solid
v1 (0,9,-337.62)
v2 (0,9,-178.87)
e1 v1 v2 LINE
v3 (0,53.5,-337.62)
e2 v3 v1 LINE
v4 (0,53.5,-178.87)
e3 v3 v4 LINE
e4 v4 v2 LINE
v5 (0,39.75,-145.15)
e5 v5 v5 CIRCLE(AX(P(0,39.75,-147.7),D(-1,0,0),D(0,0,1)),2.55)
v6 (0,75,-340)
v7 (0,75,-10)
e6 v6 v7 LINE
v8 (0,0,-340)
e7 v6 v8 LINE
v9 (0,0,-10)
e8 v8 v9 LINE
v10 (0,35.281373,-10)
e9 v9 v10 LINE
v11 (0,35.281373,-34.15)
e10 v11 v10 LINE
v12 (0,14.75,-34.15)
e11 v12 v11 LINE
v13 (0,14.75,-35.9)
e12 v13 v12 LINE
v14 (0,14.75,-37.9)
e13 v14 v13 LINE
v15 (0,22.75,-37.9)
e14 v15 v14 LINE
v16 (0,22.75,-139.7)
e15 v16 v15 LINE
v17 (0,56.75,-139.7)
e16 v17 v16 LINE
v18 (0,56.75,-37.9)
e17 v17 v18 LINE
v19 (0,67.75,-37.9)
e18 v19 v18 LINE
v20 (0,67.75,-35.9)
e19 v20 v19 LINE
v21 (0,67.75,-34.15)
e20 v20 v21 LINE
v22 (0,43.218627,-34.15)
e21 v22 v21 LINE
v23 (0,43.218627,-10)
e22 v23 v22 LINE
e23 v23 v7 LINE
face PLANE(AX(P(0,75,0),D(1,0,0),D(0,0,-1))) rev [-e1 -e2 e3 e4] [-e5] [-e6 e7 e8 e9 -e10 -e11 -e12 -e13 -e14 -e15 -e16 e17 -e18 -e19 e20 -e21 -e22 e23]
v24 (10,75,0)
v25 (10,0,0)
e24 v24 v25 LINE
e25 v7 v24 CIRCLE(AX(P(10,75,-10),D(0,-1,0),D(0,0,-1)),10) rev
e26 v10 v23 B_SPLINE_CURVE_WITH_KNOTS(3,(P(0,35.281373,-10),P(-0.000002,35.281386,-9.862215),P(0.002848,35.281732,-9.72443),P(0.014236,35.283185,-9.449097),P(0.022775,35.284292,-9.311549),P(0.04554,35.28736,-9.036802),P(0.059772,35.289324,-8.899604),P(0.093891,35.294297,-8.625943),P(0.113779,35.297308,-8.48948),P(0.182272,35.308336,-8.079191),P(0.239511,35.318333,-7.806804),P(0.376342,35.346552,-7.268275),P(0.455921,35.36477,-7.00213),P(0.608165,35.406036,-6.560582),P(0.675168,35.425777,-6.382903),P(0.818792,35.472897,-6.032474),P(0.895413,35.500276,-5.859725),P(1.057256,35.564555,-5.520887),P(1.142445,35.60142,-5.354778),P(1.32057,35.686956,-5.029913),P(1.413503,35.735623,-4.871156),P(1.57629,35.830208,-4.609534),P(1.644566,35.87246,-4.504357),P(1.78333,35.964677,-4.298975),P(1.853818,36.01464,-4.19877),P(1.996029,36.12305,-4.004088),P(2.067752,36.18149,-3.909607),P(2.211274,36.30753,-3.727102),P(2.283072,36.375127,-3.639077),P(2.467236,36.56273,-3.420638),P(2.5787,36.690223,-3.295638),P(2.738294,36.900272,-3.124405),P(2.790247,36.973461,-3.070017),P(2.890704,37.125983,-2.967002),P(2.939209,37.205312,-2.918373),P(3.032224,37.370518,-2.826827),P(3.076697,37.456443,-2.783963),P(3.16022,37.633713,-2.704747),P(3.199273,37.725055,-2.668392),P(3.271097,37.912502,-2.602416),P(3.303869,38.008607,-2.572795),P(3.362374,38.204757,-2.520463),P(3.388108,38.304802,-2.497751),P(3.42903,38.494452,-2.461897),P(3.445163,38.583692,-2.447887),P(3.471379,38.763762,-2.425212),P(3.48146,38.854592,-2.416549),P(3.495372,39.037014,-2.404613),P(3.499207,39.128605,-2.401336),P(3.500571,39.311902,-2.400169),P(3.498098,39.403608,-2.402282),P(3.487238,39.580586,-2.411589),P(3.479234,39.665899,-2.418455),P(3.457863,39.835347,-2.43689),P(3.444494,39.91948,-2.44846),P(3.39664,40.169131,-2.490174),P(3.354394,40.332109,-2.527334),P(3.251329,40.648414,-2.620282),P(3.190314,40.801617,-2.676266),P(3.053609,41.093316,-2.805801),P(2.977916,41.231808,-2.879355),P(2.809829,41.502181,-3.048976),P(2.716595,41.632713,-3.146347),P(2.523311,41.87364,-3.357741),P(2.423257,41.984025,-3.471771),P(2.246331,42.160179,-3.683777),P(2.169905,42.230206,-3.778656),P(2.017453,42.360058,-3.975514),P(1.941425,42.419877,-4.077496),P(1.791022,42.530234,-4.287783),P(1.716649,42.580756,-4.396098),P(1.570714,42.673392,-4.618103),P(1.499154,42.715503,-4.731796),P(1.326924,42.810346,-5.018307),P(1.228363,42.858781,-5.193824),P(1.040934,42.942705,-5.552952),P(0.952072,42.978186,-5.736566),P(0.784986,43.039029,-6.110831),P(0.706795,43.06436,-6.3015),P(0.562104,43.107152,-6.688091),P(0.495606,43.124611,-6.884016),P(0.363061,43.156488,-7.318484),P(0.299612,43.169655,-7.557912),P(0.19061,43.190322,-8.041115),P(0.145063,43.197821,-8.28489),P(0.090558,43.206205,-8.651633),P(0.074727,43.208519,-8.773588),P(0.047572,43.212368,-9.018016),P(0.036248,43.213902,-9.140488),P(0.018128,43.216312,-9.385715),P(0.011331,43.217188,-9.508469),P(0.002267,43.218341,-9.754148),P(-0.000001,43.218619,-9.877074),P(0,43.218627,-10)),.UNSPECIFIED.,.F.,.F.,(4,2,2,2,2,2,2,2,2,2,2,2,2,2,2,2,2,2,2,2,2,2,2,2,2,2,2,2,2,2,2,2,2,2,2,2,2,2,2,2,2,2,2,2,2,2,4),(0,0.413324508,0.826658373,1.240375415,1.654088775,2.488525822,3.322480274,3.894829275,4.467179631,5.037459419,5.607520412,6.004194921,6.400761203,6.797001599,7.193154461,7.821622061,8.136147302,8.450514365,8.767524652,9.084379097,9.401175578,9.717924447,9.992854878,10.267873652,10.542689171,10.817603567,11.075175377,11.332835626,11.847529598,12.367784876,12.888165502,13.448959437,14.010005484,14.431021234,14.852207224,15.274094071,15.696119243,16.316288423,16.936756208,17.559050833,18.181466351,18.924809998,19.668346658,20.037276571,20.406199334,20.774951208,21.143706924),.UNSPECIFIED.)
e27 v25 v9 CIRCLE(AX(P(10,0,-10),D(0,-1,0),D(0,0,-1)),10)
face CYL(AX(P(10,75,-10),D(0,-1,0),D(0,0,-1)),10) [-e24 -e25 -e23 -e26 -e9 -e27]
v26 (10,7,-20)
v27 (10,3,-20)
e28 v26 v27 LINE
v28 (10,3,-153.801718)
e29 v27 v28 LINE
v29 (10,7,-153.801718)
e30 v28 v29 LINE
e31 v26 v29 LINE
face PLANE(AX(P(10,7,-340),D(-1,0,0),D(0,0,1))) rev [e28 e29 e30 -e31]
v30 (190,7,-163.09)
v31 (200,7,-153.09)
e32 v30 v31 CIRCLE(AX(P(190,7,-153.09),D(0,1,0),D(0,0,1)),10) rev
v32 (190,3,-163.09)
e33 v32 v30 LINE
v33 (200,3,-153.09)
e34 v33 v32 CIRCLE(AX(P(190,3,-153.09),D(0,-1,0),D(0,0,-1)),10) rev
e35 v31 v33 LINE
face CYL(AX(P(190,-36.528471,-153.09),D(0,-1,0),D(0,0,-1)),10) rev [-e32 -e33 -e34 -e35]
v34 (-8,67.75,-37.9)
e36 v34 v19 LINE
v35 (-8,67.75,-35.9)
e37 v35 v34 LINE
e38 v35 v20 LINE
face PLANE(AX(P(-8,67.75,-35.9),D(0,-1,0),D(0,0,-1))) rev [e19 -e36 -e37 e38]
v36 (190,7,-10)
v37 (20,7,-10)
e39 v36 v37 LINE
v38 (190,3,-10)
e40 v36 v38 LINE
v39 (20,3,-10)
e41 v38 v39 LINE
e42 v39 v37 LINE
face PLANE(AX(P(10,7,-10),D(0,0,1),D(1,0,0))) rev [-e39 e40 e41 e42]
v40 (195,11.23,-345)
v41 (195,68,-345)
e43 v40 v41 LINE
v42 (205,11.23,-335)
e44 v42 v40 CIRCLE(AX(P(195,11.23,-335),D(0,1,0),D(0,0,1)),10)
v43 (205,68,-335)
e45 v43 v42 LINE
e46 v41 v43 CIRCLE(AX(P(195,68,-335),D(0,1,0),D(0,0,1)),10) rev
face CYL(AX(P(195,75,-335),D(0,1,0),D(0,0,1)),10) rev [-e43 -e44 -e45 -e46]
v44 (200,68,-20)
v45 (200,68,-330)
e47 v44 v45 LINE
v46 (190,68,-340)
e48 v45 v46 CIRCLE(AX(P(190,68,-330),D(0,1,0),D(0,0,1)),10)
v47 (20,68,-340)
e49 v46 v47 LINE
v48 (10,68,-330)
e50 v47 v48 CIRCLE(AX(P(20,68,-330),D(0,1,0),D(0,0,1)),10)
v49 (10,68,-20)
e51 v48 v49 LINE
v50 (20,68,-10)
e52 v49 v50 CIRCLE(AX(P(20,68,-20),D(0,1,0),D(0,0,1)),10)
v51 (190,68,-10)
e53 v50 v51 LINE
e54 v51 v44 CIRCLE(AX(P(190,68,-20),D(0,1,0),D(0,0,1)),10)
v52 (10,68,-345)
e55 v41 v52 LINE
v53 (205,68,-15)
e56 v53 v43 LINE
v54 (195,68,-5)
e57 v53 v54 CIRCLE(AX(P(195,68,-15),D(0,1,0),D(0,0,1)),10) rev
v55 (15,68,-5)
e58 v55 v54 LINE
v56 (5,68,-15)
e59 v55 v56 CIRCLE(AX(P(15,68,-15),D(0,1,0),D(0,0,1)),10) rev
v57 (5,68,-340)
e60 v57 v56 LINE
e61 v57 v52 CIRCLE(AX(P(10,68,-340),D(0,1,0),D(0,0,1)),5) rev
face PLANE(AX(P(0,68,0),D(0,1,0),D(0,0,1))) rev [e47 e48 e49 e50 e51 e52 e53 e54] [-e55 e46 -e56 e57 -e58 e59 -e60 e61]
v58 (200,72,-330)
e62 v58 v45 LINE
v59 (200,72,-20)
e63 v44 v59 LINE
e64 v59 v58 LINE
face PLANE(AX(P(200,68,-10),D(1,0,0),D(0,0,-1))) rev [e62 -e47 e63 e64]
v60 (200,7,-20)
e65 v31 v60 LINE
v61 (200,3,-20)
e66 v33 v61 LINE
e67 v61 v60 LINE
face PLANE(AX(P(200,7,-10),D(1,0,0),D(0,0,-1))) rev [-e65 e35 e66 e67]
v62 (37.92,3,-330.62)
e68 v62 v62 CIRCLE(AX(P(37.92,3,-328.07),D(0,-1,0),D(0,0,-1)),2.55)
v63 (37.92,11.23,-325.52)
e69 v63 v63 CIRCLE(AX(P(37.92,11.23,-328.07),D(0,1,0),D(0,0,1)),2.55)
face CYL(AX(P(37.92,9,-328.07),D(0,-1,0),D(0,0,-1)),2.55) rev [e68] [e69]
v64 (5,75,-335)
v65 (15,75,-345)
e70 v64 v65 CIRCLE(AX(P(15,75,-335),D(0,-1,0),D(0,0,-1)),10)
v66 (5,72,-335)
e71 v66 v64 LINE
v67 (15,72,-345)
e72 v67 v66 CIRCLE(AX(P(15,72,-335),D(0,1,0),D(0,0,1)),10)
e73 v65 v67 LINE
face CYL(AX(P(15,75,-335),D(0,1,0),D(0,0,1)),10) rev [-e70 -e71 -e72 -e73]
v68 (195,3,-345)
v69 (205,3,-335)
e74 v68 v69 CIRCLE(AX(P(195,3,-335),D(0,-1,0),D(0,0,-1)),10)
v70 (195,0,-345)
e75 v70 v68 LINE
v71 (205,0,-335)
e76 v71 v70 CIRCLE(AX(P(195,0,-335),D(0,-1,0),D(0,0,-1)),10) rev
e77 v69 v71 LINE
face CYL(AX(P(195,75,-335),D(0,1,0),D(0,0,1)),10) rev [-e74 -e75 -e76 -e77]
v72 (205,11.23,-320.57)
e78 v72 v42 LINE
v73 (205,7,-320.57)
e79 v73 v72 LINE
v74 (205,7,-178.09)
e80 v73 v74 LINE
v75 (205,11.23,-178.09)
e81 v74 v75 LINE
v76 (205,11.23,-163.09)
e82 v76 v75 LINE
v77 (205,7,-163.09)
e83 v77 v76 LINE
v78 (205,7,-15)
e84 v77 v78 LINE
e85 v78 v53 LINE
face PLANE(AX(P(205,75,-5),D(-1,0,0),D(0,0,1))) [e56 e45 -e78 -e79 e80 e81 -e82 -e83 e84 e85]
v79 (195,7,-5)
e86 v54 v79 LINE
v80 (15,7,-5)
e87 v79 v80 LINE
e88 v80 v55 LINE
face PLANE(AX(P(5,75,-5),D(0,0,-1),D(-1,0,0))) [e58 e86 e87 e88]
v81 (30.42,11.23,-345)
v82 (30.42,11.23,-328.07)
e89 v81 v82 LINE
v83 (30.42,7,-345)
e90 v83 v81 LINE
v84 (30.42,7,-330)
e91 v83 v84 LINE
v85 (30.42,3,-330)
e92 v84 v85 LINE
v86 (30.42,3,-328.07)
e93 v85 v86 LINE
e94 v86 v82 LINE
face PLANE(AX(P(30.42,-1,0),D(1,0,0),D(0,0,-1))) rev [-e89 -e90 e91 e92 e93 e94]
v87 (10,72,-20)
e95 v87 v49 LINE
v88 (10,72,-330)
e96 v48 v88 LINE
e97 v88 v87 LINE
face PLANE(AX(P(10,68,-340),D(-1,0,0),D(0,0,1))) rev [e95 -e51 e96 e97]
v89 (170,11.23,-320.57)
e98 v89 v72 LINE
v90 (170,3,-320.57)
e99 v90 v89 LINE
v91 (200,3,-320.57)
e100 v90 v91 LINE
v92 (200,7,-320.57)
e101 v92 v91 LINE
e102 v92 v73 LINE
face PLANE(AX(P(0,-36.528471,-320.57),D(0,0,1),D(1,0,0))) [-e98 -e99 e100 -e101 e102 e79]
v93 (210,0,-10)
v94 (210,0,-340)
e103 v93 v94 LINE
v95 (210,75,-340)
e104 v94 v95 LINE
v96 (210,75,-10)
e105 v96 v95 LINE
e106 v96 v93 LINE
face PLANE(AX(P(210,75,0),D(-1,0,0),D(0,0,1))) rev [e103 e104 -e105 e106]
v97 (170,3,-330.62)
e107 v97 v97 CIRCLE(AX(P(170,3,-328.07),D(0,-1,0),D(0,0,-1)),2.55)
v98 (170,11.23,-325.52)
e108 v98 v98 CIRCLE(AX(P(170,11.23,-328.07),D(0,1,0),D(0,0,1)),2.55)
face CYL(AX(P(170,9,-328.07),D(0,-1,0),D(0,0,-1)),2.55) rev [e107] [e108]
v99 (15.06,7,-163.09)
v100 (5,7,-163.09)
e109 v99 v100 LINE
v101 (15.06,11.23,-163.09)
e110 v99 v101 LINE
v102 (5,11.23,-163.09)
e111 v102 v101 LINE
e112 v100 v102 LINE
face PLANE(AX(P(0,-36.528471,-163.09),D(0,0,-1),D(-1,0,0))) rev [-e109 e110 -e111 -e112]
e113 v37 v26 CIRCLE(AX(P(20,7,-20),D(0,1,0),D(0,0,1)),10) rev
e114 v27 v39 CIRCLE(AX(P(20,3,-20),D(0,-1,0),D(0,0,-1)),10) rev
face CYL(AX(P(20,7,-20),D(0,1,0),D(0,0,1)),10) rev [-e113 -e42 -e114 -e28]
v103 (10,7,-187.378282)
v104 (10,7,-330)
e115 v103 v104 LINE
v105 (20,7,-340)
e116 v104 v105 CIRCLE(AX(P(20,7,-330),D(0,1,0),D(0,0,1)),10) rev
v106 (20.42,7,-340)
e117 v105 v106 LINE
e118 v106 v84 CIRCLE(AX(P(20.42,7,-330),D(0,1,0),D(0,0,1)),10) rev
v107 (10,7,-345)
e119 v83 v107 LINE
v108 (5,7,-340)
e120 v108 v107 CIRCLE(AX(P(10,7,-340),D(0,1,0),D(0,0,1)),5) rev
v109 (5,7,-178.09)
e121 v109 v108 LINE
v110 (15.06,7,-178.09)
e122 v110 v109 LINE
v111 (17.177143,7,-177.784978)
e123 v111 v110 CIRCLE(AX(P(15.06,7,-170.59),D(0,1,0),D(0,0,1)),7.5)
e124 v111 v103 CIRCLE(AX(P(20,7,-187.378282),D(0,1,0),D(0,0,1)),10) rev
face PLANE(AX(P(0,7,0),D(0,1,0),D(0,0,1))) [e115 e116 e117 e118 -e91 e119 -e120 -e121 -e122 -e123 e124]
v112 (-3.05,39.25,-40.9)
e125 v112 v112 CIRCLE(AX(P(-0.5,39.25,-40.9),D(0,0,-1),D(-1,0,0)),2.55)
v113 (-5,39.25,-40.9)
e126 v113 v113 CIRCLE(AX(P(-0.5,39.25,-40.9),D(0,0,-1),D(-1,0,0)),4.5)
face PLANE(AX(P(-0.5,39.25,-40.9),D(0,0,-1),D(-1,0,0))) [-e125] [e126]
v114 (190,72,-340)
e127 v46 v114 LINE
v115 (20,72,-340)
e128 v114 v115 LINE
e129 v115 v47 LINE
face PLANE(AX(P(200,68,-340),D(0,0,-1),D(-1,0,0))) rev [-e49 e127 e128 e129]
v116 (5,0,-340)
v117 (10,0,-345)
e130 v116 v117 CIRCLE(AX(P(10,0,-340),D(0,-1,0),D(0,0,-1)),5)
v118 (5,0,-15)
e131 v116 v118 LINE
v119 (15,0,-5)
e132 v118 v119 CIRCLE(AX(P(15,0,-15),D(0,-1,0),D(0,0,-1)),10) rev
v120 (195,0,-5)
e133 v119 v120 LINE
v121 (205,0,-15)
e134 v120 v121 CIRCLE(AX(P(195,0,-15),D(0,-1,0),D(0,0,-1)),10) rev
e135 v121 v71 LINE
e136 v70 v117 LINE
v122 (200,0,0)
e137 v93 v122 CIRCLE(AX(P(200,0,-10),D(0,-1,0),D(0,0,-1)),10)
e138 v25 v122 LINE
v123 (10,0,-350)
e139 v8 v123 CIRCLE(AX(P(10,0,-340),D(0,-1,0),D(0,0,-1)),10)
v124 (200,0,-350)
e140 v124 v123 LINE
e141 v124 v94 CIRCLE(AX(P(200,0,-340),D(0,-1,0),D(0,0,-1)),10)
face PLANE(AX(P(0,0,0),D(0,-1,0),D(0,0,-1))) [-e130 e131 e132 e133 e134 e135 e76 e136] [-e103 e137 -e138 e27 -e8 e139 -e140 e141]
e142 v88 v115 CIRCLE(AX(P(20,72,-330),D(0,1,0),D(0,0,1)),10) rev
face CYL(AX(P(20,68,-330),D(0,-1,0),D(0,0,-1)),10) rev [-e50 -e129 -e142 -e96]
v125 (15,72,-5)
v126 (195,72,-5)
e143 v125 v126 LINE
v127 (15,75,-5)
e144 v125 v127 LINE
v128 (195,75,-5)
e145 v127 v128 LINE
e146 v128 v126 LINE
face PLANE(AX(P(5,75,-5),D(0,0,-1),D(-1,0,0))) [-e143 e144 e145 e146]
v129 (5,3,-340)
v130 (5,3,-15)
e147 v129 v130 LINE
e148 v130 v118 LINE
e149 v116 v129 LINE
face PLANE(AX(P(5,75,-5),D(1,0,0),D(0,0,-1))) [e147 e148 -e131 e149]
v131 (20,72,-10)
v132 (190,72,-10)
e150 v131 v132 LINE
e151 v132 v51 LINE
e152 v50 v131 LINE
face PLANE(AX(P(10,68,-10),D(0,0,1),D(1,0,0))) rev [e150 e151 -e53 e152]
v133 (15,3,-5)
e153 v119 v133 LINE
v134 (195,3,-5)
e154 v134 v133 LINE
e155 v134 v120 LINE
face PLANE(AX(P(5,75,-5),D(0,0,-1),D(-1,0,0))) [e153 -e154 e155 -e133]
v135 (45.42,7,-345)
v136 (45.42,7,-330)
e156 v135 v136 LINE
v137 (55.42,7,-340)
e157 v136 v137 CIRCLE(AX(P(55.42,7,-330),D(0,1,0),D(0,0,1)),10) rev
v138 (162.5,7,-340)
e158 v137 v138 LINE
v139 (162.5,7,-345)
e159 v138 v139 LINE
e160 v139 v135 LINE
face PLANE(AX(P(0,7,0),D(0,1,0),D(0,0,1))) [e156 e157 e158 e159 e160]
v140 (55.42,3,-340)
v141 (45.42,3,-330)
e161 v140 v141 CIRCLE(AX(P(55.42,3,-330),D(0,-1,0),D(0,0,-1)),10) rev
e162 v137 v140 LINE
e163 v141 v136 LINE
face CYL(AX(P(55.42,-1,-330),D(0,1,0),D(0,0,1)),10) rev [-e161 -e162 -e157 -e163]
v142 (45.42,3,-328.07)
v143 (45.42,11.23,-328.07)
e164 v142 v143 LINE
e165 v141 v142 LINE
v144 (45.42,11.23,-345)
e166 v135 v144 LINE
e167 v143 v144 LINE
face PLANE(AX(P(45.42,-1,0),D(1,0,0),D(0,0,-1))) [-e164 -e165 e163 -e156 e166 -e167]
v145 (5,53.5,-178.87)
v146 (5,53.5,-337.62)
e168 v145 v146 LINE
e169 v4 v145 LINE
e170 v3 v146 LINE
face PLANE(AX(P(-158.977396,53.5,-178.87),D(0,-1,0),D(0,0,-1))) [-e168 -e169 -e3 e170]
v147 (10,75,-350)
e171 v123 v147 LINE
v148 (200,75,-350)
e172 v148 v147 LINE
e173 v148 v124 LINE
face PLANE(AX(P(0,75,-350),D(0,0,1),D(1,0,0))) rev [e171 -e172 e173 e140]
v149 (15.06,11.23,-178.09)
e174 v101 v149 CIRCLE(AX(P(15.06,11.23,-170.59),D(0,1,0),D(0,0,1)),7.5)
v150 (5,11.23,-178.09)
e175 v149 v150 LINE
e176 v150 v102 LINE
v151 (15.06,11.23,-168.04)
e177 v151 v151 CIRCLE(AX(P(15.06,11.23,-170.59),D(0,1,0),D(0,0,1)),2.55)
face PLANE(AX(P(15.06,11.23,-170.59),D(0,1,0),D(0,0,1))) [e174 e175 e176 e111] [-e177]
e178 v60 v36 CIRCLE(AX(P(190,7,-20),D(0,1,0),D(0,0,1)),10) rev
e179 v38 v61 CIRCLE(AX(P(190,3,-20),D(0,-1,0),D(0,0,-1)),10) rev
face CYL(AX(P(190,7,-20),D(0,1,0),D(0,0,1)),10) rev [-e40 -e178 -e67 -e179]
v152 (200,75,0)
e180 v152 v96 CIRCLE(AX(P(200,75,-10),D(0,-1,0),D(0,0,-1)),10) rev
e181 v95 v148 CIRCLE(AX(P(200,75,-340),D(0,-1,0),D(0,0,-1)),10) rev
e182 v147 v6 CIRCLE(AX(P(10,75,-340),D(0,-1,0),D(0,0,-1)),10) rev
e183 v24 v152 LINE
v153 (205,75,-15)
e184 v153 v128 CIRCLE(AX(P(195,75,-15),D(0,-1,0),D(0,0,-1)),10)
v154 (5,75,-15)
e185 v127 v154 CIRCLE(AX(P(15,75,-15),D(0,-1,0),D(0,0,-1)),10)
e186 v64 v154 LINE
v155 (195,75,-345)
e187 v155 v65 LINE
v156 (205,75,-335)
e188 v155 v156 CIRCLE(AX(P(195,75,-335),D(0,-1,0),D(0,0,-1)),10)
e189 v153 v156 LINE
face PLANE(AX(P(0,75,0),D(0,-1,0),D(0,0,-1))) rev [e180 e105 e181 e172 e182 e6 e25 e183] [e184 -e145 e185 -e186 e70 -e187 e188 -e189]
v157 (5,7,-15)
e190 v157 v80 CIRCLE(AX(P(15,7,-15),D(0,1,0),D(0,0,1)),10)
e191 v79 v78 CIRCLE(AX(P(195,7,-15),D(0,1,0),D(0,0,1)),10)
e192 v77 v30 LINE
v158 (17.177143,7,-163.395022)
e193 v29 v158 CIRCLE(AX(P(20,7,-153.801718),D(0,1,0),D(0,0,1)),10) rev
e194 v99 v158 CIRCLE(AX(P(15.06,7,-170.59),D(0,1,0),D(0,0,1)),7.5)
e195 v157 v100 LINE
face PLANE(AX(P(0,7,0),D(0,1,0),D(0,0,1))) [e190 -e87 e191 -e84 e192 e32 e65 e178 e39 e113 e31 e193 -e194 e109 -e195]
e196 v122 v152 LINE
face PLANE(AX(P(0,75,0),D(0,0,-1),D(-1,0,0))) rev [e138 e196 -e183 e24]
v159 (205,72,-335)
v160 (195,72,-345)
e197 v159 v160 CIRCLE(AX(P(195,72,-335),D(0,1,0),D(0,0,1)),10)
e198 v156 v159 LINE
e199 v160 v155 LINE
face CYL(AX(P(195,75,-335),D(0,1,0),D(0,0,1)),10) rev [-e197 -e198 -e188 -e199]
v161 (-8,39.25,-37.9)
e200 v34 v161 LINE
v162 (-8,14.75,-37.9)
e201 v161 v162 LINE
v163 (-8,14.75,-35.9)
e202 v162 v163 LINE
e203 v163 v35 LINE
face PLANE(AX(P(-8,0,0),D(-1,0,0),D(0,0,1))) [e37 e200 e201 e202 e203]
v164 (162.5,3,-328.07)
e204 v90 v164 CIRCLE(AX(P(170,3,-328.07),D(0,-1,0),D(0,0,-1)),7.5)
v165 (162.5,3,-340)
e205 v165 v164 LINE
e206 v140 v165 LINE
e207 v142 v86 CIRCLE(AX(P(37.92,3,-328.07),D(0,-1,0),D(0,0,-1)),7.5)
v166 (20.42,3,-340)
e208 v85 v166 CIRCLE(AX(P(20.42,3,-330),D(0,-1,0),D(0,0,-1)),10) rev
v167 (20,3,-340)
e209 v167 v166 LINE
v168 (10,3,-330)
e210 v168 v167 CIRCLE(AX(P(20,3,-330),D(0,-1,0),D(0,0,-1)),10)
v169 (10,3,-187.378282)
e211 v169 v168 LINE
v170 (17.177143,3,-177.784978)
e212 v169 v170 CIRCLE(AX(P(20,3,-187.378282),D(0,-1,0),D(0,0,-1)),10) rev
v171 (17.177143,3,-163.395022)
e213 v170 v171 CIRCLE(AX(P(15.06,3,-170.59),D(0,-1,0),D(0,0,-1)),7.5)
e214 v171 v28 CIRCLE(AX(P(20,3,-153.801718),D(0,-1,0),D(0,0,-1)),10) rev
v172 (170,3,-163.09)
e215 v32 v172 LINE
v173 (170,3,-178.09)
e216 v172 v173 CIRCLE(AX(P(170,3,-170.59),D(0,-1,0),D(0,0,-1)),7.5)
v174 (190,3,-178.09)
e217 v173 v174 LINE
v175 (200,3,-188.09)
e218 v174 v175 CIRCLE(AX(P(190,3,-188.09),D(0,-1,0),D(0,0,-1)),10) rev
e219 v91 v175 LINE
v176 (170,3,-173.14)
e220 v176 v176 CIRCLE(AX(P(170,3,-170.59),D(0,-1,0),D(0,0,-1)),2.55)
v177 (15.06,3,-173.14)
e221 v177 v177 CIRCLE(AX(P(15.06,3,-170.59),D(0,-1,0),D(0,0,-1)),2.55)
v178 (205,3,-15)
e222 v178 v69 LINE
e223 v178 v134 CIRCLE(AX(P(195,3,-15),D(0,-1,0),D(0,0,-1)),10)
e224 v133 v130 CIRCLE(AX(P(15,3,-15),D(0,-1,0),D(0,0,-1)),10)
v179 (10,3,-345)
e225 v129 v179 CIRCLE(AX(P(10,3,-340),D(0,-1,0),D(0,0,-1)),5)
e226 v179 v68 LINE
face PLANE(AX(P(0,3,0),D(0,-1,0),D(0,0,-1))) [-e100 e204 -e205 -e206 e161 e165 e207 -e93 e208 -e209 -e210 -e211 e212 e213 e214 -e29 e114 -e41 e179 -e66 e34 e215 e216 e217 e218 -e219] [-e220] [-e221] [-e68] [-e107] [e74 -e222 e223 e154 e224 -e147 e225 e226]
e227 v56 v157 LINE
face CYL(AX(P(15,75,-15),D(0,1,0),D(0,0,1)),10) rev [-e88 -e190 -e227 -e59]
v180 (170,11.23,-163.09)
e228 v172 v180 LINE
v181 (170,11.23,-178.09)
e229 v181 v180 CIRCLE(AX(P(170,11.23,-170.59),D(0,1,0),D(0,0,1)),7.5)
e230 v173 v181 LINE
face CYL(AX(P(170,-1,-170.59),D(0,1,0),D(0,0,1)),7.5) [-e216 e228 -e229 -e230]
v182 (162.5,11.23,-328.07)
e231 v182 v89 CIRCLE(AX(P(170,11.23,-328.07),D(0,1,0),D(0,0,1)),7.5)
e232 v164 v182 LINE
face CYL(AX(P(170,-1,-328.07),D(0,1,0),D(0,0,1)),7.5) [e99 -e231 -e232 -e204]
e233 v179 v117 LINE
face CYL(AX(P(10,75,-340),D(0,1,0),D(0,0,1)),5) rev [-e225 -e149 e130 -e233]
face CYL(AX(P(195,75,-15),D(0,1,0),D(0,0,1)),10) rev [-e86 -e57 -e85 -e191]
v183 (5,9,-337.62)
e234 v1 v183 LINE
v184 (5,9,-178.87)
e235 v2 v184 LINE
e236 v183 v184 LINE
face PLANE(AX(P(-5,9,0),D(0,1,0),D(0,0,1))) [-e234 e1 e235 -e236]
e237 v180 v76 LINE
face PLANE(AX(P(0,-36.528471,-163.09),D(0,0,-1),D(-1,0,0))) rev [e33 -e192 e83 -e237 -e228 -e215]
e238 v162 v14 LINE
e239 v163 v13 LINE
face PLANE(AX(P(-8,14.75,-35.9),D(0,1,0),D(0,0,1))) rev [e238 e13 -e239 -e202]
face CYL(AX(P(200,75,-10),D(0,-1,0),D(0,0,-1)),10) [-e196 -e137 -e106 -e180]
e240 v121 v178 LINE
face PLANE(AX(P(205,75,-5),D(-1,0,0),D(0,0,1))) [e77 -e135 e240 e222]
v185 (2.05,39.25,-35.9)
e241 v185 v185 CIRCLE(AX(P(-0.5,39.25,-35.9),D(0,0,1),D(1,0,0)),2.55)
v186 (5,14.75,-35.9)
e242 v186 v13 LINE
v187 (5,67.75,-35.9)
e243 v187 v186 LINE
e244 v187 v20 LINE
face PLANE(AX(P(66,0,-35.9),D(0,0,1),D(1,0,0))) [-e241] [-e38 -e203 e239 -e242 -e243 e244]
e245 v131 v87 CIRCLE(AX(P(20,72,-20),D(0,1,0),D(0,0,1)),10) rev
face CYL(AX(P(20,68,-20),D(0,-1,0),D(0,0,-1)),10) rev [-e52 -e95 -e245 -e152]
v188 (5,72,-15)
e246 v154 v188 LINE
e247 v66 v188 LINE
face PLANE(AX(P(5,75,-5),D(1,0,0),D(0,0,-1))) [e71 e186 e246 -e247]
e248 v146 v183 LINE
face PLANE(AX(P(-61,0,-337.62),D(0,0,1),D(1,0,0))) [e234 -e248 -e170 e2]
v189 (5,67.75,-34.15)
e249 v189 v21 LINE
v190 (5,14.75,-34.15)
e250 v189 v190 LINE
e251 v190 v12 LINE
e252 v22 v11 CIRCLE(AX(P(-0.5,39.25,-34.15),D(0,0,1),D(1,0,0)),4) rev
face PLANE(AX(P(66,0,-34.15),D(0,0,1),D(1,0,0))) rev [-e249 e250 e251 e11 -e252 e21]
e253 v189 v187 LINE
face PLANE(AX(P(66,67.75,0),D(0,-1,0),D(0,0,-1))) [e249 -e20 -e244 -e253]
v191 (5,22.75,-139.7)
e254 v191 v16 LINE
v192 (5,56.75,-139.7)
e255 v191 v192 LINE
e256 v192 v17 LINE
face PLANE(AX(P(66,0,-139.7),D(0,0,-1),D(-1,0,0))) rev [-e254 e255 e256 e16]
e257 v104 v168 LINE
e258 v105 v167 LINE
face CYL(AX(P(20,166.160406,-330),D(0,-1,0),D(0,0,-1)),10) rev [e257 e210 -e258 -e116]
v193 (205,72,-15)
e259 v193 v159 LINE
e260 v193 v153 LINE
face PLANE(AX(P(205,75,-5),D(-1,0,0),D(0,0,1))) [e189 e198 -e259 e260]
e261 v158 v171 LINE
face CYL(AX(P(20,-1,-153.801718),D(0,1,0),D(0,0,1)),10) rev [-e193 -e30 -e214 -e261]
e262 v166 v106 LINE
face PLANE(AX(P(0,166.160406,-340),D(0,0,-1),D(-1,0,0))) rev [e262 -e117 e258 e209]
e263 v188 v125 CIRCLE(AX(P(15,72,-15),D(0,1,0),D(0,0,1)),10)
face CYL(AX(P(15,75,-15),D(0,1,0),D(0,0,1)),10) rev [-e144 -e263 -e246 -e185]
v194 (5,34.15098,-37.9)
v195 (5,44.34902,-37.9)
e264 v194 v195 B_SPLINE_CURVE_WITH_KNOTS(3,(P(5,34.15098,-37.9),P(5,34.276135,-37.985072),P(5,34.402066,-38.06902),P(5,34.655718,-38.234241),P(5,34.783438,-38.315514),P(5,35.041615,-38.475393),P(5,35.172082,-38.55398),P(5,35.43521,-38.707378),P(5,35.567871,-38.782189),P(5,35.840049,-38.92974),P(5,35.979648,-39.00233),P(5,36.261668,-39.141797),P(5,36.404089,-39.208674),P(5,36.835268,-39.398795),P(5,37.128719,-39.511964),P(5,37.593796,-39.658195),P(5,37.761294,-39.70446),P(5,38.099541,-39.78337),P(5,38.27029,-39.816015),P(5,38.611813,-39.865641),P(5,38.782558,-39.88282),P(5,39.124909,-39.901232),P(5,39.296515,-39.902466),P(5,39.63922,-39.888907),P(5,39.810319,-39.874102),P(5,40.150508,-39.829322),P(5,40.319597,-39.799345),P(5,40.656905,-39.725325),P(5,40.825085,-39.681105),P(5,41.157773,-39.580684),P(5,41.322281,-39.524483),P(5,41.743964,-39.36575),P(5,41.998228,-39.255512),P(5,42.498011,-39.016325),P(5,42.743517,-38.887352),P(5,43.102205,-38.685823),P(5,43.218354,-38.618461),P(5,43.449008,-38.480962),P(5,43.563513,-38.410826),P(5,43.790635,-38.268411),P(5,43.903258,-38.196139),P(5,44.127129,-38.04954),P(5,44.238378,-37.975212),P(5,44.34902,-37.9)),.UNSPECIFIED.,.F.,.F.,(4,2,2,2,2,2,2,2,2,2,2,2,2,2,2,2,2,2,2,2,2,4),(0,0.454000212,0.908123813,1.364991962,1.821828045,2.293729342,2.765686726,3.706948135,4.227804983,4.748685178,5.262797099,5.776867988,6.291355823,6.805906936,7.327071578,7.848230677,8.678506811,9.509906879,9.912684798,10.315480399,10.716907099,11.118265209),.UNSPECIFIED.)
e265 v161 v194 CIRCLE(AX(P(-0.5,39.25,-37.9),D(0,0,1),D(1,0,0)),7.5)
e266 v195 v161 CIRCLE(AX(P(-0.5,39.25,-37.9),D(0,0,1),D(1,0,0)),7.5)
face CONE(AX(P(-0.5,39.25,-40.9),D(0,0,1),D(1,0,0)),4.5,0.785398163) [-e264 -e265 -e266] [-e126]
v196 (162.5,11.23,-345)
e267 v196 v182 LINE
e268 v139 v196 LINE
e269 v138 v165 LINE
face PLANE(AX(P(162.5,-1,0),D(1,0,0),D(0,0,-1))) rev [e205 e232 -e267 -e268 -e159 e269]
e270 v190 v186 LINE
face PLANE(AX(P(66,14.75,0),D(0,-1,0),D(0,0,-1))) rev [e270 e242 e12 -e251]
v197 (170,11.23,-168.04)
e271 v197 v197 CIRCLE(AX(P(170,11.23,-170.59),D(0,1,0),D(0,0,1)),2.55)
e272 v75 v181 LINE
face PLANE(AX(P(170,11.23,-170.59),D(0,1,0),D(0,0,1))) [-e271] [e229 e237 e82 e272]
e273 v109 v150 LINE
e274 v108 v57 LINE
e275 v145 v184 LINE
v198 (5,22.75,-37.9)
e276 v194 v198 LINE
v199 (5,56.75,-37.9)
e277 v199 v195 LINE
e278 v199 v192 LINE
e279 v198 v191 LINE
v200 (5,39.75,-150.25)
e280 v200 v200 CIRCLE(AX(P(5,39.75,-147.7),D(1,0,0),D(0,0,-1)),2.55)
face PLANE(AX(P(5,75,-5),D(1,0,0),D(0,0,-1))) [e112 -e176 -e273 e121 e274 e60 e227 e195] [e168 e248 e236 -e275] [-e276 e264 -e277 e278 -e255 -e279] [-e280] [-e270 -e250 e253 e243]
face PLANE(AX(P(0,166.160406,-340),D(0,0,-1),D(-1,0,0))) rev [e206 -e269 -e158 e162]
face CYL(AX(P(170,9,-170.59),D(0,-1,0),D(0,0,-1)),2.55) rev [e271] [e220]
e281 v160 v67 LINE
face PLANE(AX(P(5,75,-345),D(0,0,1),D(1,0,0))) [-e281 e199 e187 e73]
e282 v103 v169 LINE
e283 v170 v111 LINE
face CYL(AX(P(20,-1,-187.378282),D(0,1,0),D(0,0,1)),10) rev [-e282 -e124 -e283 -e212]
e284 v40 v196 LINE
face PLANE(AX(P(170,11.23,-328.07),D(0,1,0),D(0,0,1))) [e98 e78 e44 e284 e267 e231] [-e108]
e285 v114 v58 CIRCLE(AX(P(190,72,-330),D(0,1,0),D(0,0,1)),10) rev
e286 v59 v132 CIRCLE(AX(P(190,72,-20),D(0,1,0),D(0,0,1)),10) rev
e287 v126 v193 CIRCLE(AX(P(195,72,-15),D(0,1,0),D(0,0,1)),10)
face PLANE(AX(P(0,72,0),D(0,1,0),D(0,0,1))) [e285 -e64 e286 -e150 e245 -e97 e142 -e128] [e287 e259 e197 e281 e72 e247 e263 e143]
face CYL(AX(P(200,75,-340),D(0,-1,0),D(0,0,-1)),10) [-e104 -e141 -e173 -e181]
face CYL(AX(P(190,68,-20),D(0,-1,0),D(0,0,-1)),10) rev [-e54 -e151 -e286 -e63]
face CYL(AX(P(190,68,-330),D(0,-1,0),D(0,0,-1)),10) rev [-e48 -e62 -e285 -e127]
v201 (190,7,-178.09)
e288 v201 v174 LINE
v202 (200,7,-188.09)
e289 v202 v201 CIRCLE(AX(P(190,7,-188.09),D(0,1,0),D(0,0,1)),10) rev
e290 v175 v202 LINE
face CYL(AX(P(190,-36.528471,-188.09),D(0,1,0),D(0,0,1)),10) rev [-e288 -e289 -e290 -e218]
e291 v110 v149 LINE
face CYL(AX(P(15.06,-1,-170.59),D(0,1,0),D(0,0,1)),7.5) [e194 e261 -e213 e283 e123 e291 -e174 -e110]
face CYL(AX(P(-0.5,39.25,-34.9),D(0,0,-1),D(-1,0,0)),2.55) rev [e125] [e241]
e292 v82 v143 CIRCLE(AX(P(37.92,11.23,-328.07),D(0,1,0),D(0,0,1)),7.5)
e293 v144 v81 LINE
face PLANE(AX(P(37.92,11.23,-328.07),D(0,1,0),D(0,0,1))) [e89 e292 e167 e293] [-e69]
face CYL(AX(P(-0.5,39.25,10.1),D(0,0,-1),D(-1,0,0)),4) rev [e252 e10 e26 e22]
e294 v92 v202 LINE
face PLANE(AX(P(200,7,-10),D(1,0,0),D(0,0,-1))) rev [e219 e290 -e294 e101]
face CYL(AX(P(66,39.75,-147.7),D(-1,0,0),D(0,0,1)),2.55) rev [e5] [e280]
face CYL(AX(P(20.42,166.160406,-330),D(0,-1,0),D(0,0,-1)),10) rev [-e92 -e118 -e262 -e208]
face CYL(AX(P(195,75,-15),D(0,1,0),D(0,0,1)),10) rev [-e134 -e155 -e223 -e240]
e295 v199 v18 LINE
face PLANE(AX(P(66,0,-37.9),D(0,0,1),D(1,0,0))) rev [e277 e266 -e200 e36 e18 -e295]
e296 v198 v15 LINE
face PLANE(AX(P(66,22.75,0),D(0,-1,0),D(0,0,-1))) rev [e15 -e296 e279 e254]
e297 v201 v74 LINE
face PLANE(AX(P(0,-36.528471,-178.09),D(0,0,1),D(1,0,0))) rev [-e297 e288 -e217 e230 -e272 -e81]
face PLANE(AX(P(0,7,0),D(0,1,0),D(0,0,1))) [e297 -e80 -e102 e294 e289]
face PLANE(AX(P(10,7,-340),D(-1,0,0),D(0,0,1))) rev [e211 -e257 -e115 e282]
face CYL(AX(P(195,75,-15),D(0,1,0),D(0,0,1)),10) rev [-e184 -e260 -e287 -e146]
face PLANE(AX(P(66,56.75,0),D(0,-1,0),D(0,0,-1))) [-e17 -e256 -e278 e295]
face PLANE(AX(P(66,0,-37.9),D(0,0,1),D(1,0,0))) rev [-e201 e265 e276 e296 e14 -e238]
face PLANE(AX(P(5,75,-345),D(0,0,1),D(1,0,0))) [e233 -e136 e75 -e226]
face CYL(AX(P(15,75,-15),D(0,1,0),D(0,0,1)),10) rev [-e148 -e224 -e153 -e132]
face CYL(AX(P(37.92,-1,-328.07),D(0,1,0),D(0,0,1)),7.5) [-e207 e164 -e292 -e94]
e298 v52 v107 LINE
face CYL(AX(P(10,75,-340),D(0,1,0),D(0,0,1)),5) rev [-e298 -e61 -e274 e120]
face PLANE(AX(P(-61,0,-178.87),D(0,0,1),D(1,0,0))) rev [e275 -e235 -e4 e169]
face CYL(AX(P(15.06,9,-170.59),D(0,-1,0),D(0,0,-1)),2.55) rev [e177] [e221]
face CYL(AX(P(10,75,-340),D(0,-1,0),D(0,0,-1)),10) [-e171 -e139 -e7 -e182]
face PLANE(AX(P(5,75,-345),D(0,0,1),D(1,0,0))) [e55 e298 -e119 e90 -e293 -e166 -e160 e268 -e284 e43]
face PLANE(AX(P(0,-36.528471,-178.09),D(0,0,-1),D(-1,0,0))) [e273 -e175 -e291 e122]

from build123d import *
from build123d.topology import SkipClean

# Parameters (mm, degrees)
SKETCH1_W            = 210
SKETCH1_H            = 350
SKETCH1_W_2          = 200
SKETCH1_H_2          = 340
BOSS_EXTRUDE2_DEPTH  = 75
SKETCH3_W            = 200
SKETCH3_H            = 22.93
SKETCH3_R            = 2.55
SKETCH3_H_2          = 12
BOSS_EXTRUDE3_DEPTH  = 6
SKETCH4_W            = 158.75
SKETCH4_H            = 44.5
CUT_EXTRUDE1_DEPTH   = 66
SKETCH5_W            = 101.8
SKETCH5_H            = 13
CUT_EXTRUDE2_DEPTH   = 66
SKETCH7_W            = 2
SKETCH7_H            = 53
BOSS_EXTRUDE4_DEPTH  = 8
SKETCH8_W            = 101.8
SKETCH8_H            = 8
CUT_EXTRUDE3_DEPTH   = 8
SKETCH9_R            = 2.55
CUT_EXTRUDE4_DEPTH   = 3
BOSS_EXTRUDE5_START  = 3
SKETCH11_R           = 4.5
SKETCH11_R_2         = 2.55
BOSS_EXTRUDE5_DEPTH  = 3
CHAMFER1_SIZE        = 3
SKETCH12_R           = 4
CUT_EXTRUDE5_DEPTH   = 46
SKETCH13_W           = 200
SKETCH13_H           = 340
SKETCH13_W_2         = 190
SKETCH13_H_2         = 330
BOSS_EXTRUDE6_DEPTH  = 4
SKETCH14_W           = 200
SKETCH14_H           = 340
SKETCH14_W_2         = 190
SKETCH14_H_2         = 330
BOSS_EXTRUDE7_DEPTH  = 4
FILLET1_R            = 10
FILLET2_R            = 5
FILLET3_R            = 10
FILLET4_R            = 10
CUT_EXTRUDE8_DEPTH   = 10
BOSS_EXTRUDE8_START  = -6
BOSS_EXTRUDE8_DEPTH  = 6
BOSS_EXTRUDE9_DEPTH  = 4
FILLET5_R            = 10
SKETCH23_W           = 158.75
SKETCH23_H           = 8.5
CUT_EXTRUDE9_DEPTH   = 10
SKETCH24_W           = 158.75
SKETCH24_H           = 8.5
BOSS_EXTRUDE10_DEPTH = 5
BOSS_EXTRUDE11_START = 2.23
BOSS_EXTRUDE11_DEPTH = 2.23
SKETCH27_R           = 2.55
CUT_EXTRUDE10_DEPTH  = 49.23
FILLET6_R            = 10


with BuildPart() as part:
    # Sketch1 → Boss-Extrude2 (new body)
    with BuildSketch(Plane(origin=(0, 0, 0), x_dir=(1, 0, 0), z_dir=(0, 1, 0))):
        with Locations((105, 175)):
            Rectangle(SKETCH1_W, SKETCH1_H)
        with Locations((105, 175)):
            Rectangle(SKETCH1_W_2, SKETCH1_H_2, mode=Mode.SUBTRACT)
    extrude(amount=BOSS_EXTRUDE2_DEPTH)

    # Sketch3 → Boss-Extrude3 (add)
    # profile 1 of 2: a face of its own
    with BuildSketch(Plane(origin=(0, 3, 0), x_dir=(-1, 0, 0), z_dir=(0, -1, 0))):
        with Locations((-105, 333.535)):
            Rectangle(SKETCH3_W, SKETCH3_H)
        with Locations(Location((-170, 328.07, 0), (0, 0, 90))):
            Circle(SKETCH3_R, mode=Mode.SUBTRACT)
        with Locations(Location((-37.92, 328.07, 0), (0, 0, 90))):
            Circle(SKETCH3_R, mode=Mode.SUBTRACT)
    # profile 2 of 2: a face of its own
    with BuildSketch(Plane(origin=(0, 3, 0), x_dir=(-1, 0, 0), z_dir=(0, -1, 0))):
        with Locations((-105, 170.59)):
            Rectangle(SKETCH3_W, SKETCH3_H_2)
        with Locations(Location((-170, 170.59, 0), (0, 0, 90))):
            Circle(SKETCH3_R, mode=Mode.SUBTRACT)
        with Locations(Location((-15.06, 170.59, 0), (0, 0, 90))):
            Circle(SKETCH3_R, mode=Mode.SUBTRACT)
    extrude(amount=-BOSS_EXTRUDE3_DEPTH)

    # Sketch4 → Cut-Extrude1 (cut)
    with BuildSketch(Plane(origin=(5, 0, 0), x_dir=(0, 0, -1), z_dir=(1, 0, 0))):
        with Locations((258.245, 39.75)):
            Rectangle(SKETCH4_W, SKETCH4_H)
    extrude(amount=-CUT_EXTRUDE1_DEPTH, mode=Mode.SUBTRACT)

    # Sketch5 → Cut-Extrude2 (cut)
    with BuildSketch(Plane.ZY):
        with BuildLine():
            ThreePointArc((-145.15, 39.75), (-147.7, 42.3), (-150.25, 39.75))
            Line((-150.25, 39.75), (-147.7, 39.75))
            Line((-147.7, 39.75), (-145.15, 39.75))
        make_face()
        with BuildLine():
            Line((-147.7, 39.75), (-150.25, 39.75))
            ThreePointArc((-150.25, 39.75), (-147.7, 37.2), (-145.15, 39.75))
            Line((-145.15, 39.75), (-147.7, 39.75))
        make_face()
        with Locations((-88.8, 29.25)):
            Rectangle(SKETCH5_W, SKETCH5_H)
        with Locations((-88.8, 50.25)):
            Rectangle(SKETCH5_W, SKETCH5_H)
        Polygon((-35.9, 39.75), (-35.9, 29.25), (-35.9, 14.75), (-34.15, 14.75), (-34.15, 67.75), (-35.9, 67.75), align=None)
    extrude(amount=-CUT_EXTRUDE2_DEPTH, mode=Mode.SUBTRACT)

    # Sketch7 → Boss-Extrude4 (add)
    with BuildSketch(Plane.ZY):
        with Locations((-36.9, 41.25)):
            Rectangle(SKETCH7_W, SKETCH7_H)
    extrude(amount=BOSS_EXTRUDE4_DEPTH)

    # Sketch8 → Cut-Extrude3 (cut)
    with BuildSketch(Plane.ZY):
        with Locations((-88.8, 39.75)):
            Rectangle(SKETCH8_W, SKETCH8_H)
    extrude(amount=-CUT_EXTRUDE3_DEPTH, mode=Mode.SUBTRACT)

    # Sketch9 → Cut-Extrude4 (cut)
    with BuildSketch(Plane(origin=(0, 0, -37.9), x_dir=(-1, 0, 0), z_dir=(0, 0, -1))):
        with Locations((0.5, 39.25)):
            Circle(SKETCH9_R)
    extrude(amount=-CUT_EXTRUDE4_DEPTH, mode=Mode.SUBTRACT)

    # Sketch11 → Boss-Extrude5 (add)
    with BuildSketch(Plane(origin=(0, 0, -37.9), x_dir=(-1, 0, 0), z_dir=(0, 0, -1)).offset(BOSS_EXTRUDE5_START)):
        with Locations(Location((0.5, 39.25, 0), (0, 0, 180))):
            Circle(SKETCH11_R)
        with Locations((0.5, 39.25)):
            Circle(SKETCH11_R_2, mode=Mode.SUBTRACT)
    extrude(amount=-BOSS_EXTRUDE5_DEPTH)

    # Chamfer1
    # the kernel refuses this chamfer: 3 mm, written as the material it adds along each edge
    with BuildSketch(Plane(origin=(-0.5, 39.25, -37.9), x_dir=(1, 0, 0), z_dir=(0, 1, 0))) as chamfer1_piece_1_section:
        Polygon((4.5 + CHAMFER1_SIZE, 0), (4.5, CHAMFER1_SIZE), (4.5, 0), align=None)
    chamfer1_piece_1 = revolve(axis=Axis((-0.5, 39.25, -37.9), (0, 0, -1)), mode=Mode.PRIVATE)
    chamfer1_piece_1 = split(chamfer1_piece_1, bisect_by=Plane(origin=(5, 39.25, -39.319322), z_dir=(-1, 0, 0)), keep=Keep.TOP, mode=Mode.PRIVATE)
    chamfer1_piece_1 = split(chamfer1_piece_1, bisect_by=Plane(origin=(-8, 39.25, -39.319322), z_dir=(1, 0, 0)), keep=Keep.TOP, mode=Mode.PRIVATE)
    chamfer1_piece_1 = split(chamfer1_piece_1, bisect_by=Plane(origin=(-6.504175, 39.25, -40.9), z_dir=(0, 0, 1)), keep=Keep.TOP, mode=Mode.PRIVATE)
    add(chamfer1_piece_1)

    # Sketch12 → Cut-Extrude5 (cut)
    with BuildSketch(Plane.XY.offset(-35.9)):
        with Locations((-0.5, 39.25)):
            Circle(SKETCH12_R)
    extrude(amount=CUT_EXTRUDE5_DEPTH, mode=Mode.SUBTRACT)

    # Sketch13 → Boss-Extrude6 (add)
    with BuildSketch(Plane(origin=(0, 72, 0), x_dir=(1, 0, 0), z_dir=(0, 1, 0))):
        with Locations((105, 175)):
            Rectangle(SKETCH13_W, SKETCH13_H)
        with Locations((105, 175)):
            Rectangle(SKETCH13_W_2, SKETCH13_H_2, mode=Mode.SUBTRACT)
    extrude(amount=-BOSS_EXTRUDE6_DEPTH)

    # Sketch14 → Boss-Extrude7 (add)
    with BuildSketch(Plane.XZ.offset(-3)):
        with Locations((105, -175)):
            Rectangle(SKETCH14_W, SKETCH14_H)
        with Locations((105, -175)):
            Rectangle(SKETCH14_W_2, SKETCH14_H_2, mode=Mode.SUBTRACT)
    extrude(amount=-BOSS_EXTRUDE7_DEPTH)

    # Fillet1
    fillet1_edges = [part.edges().sort_by_distance(p)[0] for p in [
        (5, 37.5, -5),
        (205, 37.5, -5),
        (205, 38.5, -345),
    ]]
    fillet(fillet1_edges, radius=FILLET1_R)
    fillet1_2_edges = [part.edges().sort_by_distance(p)[0] for p in [
        (210, 37.5, 0),
        (0, 17.640687, 0),
        (0, 37.5, -350),
        (210, 37.5, -350),
    ]]
    fillet(fillet1_2_edges, radius=FILLET1_R)

    # Fillet2
    fillet2_edges = [part.edges().sort_by_distance(p)[0] for p in [
        (5, 38.5, -345),
    ]]
    fillet(fillet2_edges, radius=FILLET2_R)

    # Fillet3
    fillet3_edges = [part.edges().sort_by_distance(p)[0] for p in [
        (5, 73.5, -5),
        (205, 73.5, -5),
        (205, 73.5, -345),
        (5, 73.5, -345),
        (200, 70, -10),
        (10, 70, -10),
        (10, 70, -340),
        (200, 70, -340),
    ]]
    fillet(fillet3_edges, radius=FILLET3_R)

    # Fillet4
    fillet4_edges = [part.edges().sort_by_distance(p)[0] for p in [
        (5, 1.5, -5),
        (205, 1.5, -5),
        (5, 1.5, -345),
        (205, 1.5, -345),
    ]]
    fillet(fillet4_edges, radius=FILLET4_R)

    # Sketch16 → Cut-Extrude8 (cut)
    with BuildSketch(Plane(origin=(0, 9, 0), x_dir=(1, 0, 0), z_dir=(0, 1, 0))):
        with BuildLine():
            Line((45.42, 345), (45.42, 328.07))
            ThreePointArc((45.42, 328.07), (44.628204, 324.715898), (42.42, 322.07))
            Line((42.42, 322.07), (165.5, 322.07))
            ThreePointArc((165.5, 322.07), (163.291796, 324.715898), (162.5, 328.07))
            Line((162.5, 328.07), (162.5, 345))
            Line((162.5, 345), (45.42, 345))
        make_face()
        with BuildLine():
            ThreePointArc((33.42, 322.07), (31.211796, 324.715898), (30.42, 328.07))
            Line((30.42, 328.07), (30.42, 345))
            Line((30.42, 345), (10, 345))
            ThreePointArc((10, 345), (6.464466, 343.535534), (5, 340))
            Line((5, 340), (5, 322.07))
            Line((5, 322.07), (33.42, 322.07))
        make_face()
        with BuildLine():
            ThreePointArc((165.5, 164.59), (162.5, 170.59), (165.5, 176.59))
            Line((165.5, 176.59), (19.56, 176.59))
            ThreePointArc((19.56, 176.59), (21.768204, 173.944102), (22.56, 170.59))
            ThreePointArc((22.56, 170.59), (21.768204, 167.235898), (19.56, 164.59))
            Line((19.56, 164.59), (165.5, 164.59))
        make_face()
    extrude(amount=-CUT_EXTRUDE8_DEPTH, mode=Mode.SUBTRACT)

    # Sketch19 → Boss-Extrude8 (add)
    with BuildSketch(Plane(origin=(0, 9, 0), x_dir=(1, 0, 0), z_dir=(0, 1, 0)).offset(BOSS_EXTRUDE8_START)):
        with BuildLine():
            Line((205, 322.07), (165.5, 322.07))
            ThreePointArc((165.5, 322.07), (167.628292, 320.954875), (170, 320.57))
            Line((170, 320.57), (205, 320.57))
            Line((205, 320.57), (205, 322.07))
        make_face()
        with BuildLine():
            ThreePointArc((165.5, 164.59), (167.628292, 163.474875), (170, 163.09))
            Line((170, 163.09), (205, 163.09))
            Line((205, 163.09), (205, 164.59))
            Line((205, 164.59), (165.5, 164.59))
        make_face()
        with BuildLine():
            ThreePointArc((170, 178.09), (167.628292, 177.705125), (165.5, 176.59))
            Line((165.5, 176.59), (205, 176.59))
            Line((205, 176.59), (205, 178.09))
            Line((205, 178.09), (170, 178.09))
        make_face()
        with BuildLine():
            ThreePointArc((19.56, 176.59), (17.431708, 177.705125), (15.06, 178.09))
            Line((15.06, 178.09), (5, 178.09))
            Line((5, 178.09), (5, 176.59))
            Line((5, 176.59), (19.56, 176.59))
        make_face()
        with BuildLine():
            Line((5, 163.09), (15.06, 163.09))
            ThreePointArc((15.06, 163.09), (17.431708, 163.474875), (19.56, 164.59))
            Line((19.56, 164.59), (5, 164.59))
            Line((5, 164.59), (5, 163.09))
        make_face()
        with BuildLine():
            ThreePointArc((33.42, 322.07), (37.92, 320.57), (42.42, 322.07))
            Line((42.42, 322.07), (33.42, 322.07))
        make_face()
    extrude(amount=BOSS_EXTRUDE8_DEPTH)

    # Sketch22 → Boss-Extrude9 (add)
    with BuildSketch(Plane.XZ.offset(-3)):
        with BuildLine():
            Line((10, -330), (10, -322.07))
            Line((10, -322.07), (5, -322.07))
            Line((5, -322.07), (5, -340))
            ThreePointArc((5, -340), (6.464466, -343.535534), (10, -345))
            Line((10, -345), (162.5, -345))
            Line((162.5, -345), (162.5, -340))
            Line((162.5, -340), (20, -340))
            ThreePointArc((20, -340), (12.928932, -337.071068), (10, -330))
        make_face()
    extrude(amount=-BOSS_EXTRUDE9_DEPTH)

    # Fillet5
    # the kernel refuses this fillet: 10 mm, written as the material it adds along each edge
    with BuildSketch(Plane(origin=(200, 3, -178.09), x_dir=(0, 0, -1), z_dir=(0, 1, 0)), Plane(origin=(45.42, 3, -340), x_dir=(0, 0, 1), z_dir=(0, 1, 0))) as fillet5_piece_1:
        with BuildLine():
            CenterArc((FILLET5_R, FILLET5_R), FILLET5_R, 180, 90)
            Line((0, FILLET5_R), (0, 0))
            Line((0, 0), (FILLET5_R, 0))
        make_face()
    extrude(amount=4)
    with BuildSketch(Plane(origin=(200, 7, -163.09), x_dir=(-1, 0, 0), z_dir=(0, -1, 0)), Plane(origin=(30.42, 7, -340), x_dir=(-1, 0, 0), z_dir=(0, -1, 0))) as fillet5_piece_2:
        with BuildLine():
            CenterArc((FILLET5_R, -FILLET5_R), FILLET5_R, 90, 90)
            Line((0, -FILLET5_R), (0, 0))
            Line((0, 0), (FILLET5_R, 0))
        make_face()
    extrude(amount=4)
    with BuildSketch(Plane(origin=(10, 7, -178.09), x_dir=(0, 0, -1), z_dir=(0, -1, 0)), Plane(origin=(10, 3, -163.09), x_dir=(0, 0, 1), z_dir=(0, 1, 0))) as fillet5_piece_3:
        with BuildLine():
            CenterArc((9.288282, 10), FILLET5_R, 196.396671, 73.603329)
            Line((-0.305022, 7.177143), (-1.264353, 6.894857))
            ThreePointArc((-1.264353, 6.894857), (-1, 5.06), (-1, 0))
            Line((-1, 0), (0, -1))
            Line((0, -1), (9.288282, -1))
            Line((9.288282, -1), (9.288282, 0))
        make_face()
    extrude(amount=4)

    # Sketch23 → Cut-Extrude9 (cut)
    with BuildSketch(Plane(origin=(5, 0, 0), x_dir=(0, 0, -1), z_dir=(1, 0, 0))):
        with Locations((258.245, 13.25)):
            Rectangle(SKETCH23_W, SKETCH23_H)
    extrude(amount=-CUT_EXTRUDE9_DEPTH, mode=Mode.SUBTRACT)

    # Sketch24 → Boss-Extrude10 (add)
    with BuildSketch(Plane(origin=(5, 0, 0), x_dir=(0, 0, -1), z_dir=(1, 0, 0))):
        with Locations((258.245, 57.75)):
            Rectangle(SKETCH24_W, SKETCH24_H)
    extrude(amount=-BOSS_EXTRUDE10_DEPTH)

    # Sketch25 → Boss-Extrude11 (add)
    with SkipClean():  # the faces are left unmerged after this step: merging them gives an invalid solid
        with BuildSketch(Plane(origin=(0, 9, 0), x_dir=(1, 0, 0), z_dir=(0, 1, 0)).offset(BOSS_EXTRUDE11_START)):
            with BuildLine():
                Line((15.06, 178.09), (5, 178.09))
                Line((5, 178.09), (5, 163.09))
                Line((5, 163.09), (15.06, 163.09))
                ThreePointArc((15.06, 163.09), (22.56, 170.59), (15.06, 178.09))
            make_face()
            with BuildLine():
                Line((170, 163.09), (205, 163.09))
                Line((205, 163.09), (205, 178.09))
                Line((205, 178.09), (170, 178.09))
                ThreePointArc((170, 178.09), (162.5, 170.59), (170, 163.09))
            make_face()
            with BuildLine():
                Line((170, 320.57), (205, 320.57))
                Line((205, 320.57), (205, 335))
                ThreePointArc((205, 335), (202.071068, 342.071068), (195, 345))
                Line((195, 345), (162.5, 345))
                Line((162.5, 345), (162.5, 328.07))
                ThreePointArc((162.5, 328.07), (164.696699, 322.766699), (170, 320.57))
            make_face()
            with BuildLine():
                Line((45.42, 345), (30.42, 345))
                Line((30.42, 345), (30.42, 328.07))
                ThreePointArc((30.42, 328.07), (37.92, 320.57), (45.42, 328.07))
                Line((45.42, 328.07), (45.42, 345))
            make_face()
        extrude(amount=-BOSS_EXTRUDE11_DEPTH)

    # Sketch27 → Cut-Extrude10 (cut)
    with SkipClean():  # the faces are left unmerged after this step: merging them gives an invalid solid
        with BuildSketch(Plane.XZ.offset(-3)):
            with Locations(Location((37.92, -328.07, 0), (0, 0, 270))):
                Circle(SKETCH27_R)
            with Locations(Location((170, -328.07, 0), (0, 0, 270))):
                Circle(SKETCH27_R)
            with Locations(Location((170, -170.59, 0), (0, 0, 270))):
                Circle(SKETCH27_R)
            with Locations(Location((15.06, -170.59, 0), (0, 0, 270))):
                Circle(SKETCH27_R)
        extrude(amount=-CUT_EXTRUDE10_DEPTH, mode=Mode.SUBTRACT)

    # Fillet6
    fillet6_edges = [part.edges().sort_by_distance(p)[0] for p in [
        (10, 5, -10),
        (200, 5, -10),
    ]]
    fillet(fillet6_edges, radius=FILLET6_R)


solid = part.part
